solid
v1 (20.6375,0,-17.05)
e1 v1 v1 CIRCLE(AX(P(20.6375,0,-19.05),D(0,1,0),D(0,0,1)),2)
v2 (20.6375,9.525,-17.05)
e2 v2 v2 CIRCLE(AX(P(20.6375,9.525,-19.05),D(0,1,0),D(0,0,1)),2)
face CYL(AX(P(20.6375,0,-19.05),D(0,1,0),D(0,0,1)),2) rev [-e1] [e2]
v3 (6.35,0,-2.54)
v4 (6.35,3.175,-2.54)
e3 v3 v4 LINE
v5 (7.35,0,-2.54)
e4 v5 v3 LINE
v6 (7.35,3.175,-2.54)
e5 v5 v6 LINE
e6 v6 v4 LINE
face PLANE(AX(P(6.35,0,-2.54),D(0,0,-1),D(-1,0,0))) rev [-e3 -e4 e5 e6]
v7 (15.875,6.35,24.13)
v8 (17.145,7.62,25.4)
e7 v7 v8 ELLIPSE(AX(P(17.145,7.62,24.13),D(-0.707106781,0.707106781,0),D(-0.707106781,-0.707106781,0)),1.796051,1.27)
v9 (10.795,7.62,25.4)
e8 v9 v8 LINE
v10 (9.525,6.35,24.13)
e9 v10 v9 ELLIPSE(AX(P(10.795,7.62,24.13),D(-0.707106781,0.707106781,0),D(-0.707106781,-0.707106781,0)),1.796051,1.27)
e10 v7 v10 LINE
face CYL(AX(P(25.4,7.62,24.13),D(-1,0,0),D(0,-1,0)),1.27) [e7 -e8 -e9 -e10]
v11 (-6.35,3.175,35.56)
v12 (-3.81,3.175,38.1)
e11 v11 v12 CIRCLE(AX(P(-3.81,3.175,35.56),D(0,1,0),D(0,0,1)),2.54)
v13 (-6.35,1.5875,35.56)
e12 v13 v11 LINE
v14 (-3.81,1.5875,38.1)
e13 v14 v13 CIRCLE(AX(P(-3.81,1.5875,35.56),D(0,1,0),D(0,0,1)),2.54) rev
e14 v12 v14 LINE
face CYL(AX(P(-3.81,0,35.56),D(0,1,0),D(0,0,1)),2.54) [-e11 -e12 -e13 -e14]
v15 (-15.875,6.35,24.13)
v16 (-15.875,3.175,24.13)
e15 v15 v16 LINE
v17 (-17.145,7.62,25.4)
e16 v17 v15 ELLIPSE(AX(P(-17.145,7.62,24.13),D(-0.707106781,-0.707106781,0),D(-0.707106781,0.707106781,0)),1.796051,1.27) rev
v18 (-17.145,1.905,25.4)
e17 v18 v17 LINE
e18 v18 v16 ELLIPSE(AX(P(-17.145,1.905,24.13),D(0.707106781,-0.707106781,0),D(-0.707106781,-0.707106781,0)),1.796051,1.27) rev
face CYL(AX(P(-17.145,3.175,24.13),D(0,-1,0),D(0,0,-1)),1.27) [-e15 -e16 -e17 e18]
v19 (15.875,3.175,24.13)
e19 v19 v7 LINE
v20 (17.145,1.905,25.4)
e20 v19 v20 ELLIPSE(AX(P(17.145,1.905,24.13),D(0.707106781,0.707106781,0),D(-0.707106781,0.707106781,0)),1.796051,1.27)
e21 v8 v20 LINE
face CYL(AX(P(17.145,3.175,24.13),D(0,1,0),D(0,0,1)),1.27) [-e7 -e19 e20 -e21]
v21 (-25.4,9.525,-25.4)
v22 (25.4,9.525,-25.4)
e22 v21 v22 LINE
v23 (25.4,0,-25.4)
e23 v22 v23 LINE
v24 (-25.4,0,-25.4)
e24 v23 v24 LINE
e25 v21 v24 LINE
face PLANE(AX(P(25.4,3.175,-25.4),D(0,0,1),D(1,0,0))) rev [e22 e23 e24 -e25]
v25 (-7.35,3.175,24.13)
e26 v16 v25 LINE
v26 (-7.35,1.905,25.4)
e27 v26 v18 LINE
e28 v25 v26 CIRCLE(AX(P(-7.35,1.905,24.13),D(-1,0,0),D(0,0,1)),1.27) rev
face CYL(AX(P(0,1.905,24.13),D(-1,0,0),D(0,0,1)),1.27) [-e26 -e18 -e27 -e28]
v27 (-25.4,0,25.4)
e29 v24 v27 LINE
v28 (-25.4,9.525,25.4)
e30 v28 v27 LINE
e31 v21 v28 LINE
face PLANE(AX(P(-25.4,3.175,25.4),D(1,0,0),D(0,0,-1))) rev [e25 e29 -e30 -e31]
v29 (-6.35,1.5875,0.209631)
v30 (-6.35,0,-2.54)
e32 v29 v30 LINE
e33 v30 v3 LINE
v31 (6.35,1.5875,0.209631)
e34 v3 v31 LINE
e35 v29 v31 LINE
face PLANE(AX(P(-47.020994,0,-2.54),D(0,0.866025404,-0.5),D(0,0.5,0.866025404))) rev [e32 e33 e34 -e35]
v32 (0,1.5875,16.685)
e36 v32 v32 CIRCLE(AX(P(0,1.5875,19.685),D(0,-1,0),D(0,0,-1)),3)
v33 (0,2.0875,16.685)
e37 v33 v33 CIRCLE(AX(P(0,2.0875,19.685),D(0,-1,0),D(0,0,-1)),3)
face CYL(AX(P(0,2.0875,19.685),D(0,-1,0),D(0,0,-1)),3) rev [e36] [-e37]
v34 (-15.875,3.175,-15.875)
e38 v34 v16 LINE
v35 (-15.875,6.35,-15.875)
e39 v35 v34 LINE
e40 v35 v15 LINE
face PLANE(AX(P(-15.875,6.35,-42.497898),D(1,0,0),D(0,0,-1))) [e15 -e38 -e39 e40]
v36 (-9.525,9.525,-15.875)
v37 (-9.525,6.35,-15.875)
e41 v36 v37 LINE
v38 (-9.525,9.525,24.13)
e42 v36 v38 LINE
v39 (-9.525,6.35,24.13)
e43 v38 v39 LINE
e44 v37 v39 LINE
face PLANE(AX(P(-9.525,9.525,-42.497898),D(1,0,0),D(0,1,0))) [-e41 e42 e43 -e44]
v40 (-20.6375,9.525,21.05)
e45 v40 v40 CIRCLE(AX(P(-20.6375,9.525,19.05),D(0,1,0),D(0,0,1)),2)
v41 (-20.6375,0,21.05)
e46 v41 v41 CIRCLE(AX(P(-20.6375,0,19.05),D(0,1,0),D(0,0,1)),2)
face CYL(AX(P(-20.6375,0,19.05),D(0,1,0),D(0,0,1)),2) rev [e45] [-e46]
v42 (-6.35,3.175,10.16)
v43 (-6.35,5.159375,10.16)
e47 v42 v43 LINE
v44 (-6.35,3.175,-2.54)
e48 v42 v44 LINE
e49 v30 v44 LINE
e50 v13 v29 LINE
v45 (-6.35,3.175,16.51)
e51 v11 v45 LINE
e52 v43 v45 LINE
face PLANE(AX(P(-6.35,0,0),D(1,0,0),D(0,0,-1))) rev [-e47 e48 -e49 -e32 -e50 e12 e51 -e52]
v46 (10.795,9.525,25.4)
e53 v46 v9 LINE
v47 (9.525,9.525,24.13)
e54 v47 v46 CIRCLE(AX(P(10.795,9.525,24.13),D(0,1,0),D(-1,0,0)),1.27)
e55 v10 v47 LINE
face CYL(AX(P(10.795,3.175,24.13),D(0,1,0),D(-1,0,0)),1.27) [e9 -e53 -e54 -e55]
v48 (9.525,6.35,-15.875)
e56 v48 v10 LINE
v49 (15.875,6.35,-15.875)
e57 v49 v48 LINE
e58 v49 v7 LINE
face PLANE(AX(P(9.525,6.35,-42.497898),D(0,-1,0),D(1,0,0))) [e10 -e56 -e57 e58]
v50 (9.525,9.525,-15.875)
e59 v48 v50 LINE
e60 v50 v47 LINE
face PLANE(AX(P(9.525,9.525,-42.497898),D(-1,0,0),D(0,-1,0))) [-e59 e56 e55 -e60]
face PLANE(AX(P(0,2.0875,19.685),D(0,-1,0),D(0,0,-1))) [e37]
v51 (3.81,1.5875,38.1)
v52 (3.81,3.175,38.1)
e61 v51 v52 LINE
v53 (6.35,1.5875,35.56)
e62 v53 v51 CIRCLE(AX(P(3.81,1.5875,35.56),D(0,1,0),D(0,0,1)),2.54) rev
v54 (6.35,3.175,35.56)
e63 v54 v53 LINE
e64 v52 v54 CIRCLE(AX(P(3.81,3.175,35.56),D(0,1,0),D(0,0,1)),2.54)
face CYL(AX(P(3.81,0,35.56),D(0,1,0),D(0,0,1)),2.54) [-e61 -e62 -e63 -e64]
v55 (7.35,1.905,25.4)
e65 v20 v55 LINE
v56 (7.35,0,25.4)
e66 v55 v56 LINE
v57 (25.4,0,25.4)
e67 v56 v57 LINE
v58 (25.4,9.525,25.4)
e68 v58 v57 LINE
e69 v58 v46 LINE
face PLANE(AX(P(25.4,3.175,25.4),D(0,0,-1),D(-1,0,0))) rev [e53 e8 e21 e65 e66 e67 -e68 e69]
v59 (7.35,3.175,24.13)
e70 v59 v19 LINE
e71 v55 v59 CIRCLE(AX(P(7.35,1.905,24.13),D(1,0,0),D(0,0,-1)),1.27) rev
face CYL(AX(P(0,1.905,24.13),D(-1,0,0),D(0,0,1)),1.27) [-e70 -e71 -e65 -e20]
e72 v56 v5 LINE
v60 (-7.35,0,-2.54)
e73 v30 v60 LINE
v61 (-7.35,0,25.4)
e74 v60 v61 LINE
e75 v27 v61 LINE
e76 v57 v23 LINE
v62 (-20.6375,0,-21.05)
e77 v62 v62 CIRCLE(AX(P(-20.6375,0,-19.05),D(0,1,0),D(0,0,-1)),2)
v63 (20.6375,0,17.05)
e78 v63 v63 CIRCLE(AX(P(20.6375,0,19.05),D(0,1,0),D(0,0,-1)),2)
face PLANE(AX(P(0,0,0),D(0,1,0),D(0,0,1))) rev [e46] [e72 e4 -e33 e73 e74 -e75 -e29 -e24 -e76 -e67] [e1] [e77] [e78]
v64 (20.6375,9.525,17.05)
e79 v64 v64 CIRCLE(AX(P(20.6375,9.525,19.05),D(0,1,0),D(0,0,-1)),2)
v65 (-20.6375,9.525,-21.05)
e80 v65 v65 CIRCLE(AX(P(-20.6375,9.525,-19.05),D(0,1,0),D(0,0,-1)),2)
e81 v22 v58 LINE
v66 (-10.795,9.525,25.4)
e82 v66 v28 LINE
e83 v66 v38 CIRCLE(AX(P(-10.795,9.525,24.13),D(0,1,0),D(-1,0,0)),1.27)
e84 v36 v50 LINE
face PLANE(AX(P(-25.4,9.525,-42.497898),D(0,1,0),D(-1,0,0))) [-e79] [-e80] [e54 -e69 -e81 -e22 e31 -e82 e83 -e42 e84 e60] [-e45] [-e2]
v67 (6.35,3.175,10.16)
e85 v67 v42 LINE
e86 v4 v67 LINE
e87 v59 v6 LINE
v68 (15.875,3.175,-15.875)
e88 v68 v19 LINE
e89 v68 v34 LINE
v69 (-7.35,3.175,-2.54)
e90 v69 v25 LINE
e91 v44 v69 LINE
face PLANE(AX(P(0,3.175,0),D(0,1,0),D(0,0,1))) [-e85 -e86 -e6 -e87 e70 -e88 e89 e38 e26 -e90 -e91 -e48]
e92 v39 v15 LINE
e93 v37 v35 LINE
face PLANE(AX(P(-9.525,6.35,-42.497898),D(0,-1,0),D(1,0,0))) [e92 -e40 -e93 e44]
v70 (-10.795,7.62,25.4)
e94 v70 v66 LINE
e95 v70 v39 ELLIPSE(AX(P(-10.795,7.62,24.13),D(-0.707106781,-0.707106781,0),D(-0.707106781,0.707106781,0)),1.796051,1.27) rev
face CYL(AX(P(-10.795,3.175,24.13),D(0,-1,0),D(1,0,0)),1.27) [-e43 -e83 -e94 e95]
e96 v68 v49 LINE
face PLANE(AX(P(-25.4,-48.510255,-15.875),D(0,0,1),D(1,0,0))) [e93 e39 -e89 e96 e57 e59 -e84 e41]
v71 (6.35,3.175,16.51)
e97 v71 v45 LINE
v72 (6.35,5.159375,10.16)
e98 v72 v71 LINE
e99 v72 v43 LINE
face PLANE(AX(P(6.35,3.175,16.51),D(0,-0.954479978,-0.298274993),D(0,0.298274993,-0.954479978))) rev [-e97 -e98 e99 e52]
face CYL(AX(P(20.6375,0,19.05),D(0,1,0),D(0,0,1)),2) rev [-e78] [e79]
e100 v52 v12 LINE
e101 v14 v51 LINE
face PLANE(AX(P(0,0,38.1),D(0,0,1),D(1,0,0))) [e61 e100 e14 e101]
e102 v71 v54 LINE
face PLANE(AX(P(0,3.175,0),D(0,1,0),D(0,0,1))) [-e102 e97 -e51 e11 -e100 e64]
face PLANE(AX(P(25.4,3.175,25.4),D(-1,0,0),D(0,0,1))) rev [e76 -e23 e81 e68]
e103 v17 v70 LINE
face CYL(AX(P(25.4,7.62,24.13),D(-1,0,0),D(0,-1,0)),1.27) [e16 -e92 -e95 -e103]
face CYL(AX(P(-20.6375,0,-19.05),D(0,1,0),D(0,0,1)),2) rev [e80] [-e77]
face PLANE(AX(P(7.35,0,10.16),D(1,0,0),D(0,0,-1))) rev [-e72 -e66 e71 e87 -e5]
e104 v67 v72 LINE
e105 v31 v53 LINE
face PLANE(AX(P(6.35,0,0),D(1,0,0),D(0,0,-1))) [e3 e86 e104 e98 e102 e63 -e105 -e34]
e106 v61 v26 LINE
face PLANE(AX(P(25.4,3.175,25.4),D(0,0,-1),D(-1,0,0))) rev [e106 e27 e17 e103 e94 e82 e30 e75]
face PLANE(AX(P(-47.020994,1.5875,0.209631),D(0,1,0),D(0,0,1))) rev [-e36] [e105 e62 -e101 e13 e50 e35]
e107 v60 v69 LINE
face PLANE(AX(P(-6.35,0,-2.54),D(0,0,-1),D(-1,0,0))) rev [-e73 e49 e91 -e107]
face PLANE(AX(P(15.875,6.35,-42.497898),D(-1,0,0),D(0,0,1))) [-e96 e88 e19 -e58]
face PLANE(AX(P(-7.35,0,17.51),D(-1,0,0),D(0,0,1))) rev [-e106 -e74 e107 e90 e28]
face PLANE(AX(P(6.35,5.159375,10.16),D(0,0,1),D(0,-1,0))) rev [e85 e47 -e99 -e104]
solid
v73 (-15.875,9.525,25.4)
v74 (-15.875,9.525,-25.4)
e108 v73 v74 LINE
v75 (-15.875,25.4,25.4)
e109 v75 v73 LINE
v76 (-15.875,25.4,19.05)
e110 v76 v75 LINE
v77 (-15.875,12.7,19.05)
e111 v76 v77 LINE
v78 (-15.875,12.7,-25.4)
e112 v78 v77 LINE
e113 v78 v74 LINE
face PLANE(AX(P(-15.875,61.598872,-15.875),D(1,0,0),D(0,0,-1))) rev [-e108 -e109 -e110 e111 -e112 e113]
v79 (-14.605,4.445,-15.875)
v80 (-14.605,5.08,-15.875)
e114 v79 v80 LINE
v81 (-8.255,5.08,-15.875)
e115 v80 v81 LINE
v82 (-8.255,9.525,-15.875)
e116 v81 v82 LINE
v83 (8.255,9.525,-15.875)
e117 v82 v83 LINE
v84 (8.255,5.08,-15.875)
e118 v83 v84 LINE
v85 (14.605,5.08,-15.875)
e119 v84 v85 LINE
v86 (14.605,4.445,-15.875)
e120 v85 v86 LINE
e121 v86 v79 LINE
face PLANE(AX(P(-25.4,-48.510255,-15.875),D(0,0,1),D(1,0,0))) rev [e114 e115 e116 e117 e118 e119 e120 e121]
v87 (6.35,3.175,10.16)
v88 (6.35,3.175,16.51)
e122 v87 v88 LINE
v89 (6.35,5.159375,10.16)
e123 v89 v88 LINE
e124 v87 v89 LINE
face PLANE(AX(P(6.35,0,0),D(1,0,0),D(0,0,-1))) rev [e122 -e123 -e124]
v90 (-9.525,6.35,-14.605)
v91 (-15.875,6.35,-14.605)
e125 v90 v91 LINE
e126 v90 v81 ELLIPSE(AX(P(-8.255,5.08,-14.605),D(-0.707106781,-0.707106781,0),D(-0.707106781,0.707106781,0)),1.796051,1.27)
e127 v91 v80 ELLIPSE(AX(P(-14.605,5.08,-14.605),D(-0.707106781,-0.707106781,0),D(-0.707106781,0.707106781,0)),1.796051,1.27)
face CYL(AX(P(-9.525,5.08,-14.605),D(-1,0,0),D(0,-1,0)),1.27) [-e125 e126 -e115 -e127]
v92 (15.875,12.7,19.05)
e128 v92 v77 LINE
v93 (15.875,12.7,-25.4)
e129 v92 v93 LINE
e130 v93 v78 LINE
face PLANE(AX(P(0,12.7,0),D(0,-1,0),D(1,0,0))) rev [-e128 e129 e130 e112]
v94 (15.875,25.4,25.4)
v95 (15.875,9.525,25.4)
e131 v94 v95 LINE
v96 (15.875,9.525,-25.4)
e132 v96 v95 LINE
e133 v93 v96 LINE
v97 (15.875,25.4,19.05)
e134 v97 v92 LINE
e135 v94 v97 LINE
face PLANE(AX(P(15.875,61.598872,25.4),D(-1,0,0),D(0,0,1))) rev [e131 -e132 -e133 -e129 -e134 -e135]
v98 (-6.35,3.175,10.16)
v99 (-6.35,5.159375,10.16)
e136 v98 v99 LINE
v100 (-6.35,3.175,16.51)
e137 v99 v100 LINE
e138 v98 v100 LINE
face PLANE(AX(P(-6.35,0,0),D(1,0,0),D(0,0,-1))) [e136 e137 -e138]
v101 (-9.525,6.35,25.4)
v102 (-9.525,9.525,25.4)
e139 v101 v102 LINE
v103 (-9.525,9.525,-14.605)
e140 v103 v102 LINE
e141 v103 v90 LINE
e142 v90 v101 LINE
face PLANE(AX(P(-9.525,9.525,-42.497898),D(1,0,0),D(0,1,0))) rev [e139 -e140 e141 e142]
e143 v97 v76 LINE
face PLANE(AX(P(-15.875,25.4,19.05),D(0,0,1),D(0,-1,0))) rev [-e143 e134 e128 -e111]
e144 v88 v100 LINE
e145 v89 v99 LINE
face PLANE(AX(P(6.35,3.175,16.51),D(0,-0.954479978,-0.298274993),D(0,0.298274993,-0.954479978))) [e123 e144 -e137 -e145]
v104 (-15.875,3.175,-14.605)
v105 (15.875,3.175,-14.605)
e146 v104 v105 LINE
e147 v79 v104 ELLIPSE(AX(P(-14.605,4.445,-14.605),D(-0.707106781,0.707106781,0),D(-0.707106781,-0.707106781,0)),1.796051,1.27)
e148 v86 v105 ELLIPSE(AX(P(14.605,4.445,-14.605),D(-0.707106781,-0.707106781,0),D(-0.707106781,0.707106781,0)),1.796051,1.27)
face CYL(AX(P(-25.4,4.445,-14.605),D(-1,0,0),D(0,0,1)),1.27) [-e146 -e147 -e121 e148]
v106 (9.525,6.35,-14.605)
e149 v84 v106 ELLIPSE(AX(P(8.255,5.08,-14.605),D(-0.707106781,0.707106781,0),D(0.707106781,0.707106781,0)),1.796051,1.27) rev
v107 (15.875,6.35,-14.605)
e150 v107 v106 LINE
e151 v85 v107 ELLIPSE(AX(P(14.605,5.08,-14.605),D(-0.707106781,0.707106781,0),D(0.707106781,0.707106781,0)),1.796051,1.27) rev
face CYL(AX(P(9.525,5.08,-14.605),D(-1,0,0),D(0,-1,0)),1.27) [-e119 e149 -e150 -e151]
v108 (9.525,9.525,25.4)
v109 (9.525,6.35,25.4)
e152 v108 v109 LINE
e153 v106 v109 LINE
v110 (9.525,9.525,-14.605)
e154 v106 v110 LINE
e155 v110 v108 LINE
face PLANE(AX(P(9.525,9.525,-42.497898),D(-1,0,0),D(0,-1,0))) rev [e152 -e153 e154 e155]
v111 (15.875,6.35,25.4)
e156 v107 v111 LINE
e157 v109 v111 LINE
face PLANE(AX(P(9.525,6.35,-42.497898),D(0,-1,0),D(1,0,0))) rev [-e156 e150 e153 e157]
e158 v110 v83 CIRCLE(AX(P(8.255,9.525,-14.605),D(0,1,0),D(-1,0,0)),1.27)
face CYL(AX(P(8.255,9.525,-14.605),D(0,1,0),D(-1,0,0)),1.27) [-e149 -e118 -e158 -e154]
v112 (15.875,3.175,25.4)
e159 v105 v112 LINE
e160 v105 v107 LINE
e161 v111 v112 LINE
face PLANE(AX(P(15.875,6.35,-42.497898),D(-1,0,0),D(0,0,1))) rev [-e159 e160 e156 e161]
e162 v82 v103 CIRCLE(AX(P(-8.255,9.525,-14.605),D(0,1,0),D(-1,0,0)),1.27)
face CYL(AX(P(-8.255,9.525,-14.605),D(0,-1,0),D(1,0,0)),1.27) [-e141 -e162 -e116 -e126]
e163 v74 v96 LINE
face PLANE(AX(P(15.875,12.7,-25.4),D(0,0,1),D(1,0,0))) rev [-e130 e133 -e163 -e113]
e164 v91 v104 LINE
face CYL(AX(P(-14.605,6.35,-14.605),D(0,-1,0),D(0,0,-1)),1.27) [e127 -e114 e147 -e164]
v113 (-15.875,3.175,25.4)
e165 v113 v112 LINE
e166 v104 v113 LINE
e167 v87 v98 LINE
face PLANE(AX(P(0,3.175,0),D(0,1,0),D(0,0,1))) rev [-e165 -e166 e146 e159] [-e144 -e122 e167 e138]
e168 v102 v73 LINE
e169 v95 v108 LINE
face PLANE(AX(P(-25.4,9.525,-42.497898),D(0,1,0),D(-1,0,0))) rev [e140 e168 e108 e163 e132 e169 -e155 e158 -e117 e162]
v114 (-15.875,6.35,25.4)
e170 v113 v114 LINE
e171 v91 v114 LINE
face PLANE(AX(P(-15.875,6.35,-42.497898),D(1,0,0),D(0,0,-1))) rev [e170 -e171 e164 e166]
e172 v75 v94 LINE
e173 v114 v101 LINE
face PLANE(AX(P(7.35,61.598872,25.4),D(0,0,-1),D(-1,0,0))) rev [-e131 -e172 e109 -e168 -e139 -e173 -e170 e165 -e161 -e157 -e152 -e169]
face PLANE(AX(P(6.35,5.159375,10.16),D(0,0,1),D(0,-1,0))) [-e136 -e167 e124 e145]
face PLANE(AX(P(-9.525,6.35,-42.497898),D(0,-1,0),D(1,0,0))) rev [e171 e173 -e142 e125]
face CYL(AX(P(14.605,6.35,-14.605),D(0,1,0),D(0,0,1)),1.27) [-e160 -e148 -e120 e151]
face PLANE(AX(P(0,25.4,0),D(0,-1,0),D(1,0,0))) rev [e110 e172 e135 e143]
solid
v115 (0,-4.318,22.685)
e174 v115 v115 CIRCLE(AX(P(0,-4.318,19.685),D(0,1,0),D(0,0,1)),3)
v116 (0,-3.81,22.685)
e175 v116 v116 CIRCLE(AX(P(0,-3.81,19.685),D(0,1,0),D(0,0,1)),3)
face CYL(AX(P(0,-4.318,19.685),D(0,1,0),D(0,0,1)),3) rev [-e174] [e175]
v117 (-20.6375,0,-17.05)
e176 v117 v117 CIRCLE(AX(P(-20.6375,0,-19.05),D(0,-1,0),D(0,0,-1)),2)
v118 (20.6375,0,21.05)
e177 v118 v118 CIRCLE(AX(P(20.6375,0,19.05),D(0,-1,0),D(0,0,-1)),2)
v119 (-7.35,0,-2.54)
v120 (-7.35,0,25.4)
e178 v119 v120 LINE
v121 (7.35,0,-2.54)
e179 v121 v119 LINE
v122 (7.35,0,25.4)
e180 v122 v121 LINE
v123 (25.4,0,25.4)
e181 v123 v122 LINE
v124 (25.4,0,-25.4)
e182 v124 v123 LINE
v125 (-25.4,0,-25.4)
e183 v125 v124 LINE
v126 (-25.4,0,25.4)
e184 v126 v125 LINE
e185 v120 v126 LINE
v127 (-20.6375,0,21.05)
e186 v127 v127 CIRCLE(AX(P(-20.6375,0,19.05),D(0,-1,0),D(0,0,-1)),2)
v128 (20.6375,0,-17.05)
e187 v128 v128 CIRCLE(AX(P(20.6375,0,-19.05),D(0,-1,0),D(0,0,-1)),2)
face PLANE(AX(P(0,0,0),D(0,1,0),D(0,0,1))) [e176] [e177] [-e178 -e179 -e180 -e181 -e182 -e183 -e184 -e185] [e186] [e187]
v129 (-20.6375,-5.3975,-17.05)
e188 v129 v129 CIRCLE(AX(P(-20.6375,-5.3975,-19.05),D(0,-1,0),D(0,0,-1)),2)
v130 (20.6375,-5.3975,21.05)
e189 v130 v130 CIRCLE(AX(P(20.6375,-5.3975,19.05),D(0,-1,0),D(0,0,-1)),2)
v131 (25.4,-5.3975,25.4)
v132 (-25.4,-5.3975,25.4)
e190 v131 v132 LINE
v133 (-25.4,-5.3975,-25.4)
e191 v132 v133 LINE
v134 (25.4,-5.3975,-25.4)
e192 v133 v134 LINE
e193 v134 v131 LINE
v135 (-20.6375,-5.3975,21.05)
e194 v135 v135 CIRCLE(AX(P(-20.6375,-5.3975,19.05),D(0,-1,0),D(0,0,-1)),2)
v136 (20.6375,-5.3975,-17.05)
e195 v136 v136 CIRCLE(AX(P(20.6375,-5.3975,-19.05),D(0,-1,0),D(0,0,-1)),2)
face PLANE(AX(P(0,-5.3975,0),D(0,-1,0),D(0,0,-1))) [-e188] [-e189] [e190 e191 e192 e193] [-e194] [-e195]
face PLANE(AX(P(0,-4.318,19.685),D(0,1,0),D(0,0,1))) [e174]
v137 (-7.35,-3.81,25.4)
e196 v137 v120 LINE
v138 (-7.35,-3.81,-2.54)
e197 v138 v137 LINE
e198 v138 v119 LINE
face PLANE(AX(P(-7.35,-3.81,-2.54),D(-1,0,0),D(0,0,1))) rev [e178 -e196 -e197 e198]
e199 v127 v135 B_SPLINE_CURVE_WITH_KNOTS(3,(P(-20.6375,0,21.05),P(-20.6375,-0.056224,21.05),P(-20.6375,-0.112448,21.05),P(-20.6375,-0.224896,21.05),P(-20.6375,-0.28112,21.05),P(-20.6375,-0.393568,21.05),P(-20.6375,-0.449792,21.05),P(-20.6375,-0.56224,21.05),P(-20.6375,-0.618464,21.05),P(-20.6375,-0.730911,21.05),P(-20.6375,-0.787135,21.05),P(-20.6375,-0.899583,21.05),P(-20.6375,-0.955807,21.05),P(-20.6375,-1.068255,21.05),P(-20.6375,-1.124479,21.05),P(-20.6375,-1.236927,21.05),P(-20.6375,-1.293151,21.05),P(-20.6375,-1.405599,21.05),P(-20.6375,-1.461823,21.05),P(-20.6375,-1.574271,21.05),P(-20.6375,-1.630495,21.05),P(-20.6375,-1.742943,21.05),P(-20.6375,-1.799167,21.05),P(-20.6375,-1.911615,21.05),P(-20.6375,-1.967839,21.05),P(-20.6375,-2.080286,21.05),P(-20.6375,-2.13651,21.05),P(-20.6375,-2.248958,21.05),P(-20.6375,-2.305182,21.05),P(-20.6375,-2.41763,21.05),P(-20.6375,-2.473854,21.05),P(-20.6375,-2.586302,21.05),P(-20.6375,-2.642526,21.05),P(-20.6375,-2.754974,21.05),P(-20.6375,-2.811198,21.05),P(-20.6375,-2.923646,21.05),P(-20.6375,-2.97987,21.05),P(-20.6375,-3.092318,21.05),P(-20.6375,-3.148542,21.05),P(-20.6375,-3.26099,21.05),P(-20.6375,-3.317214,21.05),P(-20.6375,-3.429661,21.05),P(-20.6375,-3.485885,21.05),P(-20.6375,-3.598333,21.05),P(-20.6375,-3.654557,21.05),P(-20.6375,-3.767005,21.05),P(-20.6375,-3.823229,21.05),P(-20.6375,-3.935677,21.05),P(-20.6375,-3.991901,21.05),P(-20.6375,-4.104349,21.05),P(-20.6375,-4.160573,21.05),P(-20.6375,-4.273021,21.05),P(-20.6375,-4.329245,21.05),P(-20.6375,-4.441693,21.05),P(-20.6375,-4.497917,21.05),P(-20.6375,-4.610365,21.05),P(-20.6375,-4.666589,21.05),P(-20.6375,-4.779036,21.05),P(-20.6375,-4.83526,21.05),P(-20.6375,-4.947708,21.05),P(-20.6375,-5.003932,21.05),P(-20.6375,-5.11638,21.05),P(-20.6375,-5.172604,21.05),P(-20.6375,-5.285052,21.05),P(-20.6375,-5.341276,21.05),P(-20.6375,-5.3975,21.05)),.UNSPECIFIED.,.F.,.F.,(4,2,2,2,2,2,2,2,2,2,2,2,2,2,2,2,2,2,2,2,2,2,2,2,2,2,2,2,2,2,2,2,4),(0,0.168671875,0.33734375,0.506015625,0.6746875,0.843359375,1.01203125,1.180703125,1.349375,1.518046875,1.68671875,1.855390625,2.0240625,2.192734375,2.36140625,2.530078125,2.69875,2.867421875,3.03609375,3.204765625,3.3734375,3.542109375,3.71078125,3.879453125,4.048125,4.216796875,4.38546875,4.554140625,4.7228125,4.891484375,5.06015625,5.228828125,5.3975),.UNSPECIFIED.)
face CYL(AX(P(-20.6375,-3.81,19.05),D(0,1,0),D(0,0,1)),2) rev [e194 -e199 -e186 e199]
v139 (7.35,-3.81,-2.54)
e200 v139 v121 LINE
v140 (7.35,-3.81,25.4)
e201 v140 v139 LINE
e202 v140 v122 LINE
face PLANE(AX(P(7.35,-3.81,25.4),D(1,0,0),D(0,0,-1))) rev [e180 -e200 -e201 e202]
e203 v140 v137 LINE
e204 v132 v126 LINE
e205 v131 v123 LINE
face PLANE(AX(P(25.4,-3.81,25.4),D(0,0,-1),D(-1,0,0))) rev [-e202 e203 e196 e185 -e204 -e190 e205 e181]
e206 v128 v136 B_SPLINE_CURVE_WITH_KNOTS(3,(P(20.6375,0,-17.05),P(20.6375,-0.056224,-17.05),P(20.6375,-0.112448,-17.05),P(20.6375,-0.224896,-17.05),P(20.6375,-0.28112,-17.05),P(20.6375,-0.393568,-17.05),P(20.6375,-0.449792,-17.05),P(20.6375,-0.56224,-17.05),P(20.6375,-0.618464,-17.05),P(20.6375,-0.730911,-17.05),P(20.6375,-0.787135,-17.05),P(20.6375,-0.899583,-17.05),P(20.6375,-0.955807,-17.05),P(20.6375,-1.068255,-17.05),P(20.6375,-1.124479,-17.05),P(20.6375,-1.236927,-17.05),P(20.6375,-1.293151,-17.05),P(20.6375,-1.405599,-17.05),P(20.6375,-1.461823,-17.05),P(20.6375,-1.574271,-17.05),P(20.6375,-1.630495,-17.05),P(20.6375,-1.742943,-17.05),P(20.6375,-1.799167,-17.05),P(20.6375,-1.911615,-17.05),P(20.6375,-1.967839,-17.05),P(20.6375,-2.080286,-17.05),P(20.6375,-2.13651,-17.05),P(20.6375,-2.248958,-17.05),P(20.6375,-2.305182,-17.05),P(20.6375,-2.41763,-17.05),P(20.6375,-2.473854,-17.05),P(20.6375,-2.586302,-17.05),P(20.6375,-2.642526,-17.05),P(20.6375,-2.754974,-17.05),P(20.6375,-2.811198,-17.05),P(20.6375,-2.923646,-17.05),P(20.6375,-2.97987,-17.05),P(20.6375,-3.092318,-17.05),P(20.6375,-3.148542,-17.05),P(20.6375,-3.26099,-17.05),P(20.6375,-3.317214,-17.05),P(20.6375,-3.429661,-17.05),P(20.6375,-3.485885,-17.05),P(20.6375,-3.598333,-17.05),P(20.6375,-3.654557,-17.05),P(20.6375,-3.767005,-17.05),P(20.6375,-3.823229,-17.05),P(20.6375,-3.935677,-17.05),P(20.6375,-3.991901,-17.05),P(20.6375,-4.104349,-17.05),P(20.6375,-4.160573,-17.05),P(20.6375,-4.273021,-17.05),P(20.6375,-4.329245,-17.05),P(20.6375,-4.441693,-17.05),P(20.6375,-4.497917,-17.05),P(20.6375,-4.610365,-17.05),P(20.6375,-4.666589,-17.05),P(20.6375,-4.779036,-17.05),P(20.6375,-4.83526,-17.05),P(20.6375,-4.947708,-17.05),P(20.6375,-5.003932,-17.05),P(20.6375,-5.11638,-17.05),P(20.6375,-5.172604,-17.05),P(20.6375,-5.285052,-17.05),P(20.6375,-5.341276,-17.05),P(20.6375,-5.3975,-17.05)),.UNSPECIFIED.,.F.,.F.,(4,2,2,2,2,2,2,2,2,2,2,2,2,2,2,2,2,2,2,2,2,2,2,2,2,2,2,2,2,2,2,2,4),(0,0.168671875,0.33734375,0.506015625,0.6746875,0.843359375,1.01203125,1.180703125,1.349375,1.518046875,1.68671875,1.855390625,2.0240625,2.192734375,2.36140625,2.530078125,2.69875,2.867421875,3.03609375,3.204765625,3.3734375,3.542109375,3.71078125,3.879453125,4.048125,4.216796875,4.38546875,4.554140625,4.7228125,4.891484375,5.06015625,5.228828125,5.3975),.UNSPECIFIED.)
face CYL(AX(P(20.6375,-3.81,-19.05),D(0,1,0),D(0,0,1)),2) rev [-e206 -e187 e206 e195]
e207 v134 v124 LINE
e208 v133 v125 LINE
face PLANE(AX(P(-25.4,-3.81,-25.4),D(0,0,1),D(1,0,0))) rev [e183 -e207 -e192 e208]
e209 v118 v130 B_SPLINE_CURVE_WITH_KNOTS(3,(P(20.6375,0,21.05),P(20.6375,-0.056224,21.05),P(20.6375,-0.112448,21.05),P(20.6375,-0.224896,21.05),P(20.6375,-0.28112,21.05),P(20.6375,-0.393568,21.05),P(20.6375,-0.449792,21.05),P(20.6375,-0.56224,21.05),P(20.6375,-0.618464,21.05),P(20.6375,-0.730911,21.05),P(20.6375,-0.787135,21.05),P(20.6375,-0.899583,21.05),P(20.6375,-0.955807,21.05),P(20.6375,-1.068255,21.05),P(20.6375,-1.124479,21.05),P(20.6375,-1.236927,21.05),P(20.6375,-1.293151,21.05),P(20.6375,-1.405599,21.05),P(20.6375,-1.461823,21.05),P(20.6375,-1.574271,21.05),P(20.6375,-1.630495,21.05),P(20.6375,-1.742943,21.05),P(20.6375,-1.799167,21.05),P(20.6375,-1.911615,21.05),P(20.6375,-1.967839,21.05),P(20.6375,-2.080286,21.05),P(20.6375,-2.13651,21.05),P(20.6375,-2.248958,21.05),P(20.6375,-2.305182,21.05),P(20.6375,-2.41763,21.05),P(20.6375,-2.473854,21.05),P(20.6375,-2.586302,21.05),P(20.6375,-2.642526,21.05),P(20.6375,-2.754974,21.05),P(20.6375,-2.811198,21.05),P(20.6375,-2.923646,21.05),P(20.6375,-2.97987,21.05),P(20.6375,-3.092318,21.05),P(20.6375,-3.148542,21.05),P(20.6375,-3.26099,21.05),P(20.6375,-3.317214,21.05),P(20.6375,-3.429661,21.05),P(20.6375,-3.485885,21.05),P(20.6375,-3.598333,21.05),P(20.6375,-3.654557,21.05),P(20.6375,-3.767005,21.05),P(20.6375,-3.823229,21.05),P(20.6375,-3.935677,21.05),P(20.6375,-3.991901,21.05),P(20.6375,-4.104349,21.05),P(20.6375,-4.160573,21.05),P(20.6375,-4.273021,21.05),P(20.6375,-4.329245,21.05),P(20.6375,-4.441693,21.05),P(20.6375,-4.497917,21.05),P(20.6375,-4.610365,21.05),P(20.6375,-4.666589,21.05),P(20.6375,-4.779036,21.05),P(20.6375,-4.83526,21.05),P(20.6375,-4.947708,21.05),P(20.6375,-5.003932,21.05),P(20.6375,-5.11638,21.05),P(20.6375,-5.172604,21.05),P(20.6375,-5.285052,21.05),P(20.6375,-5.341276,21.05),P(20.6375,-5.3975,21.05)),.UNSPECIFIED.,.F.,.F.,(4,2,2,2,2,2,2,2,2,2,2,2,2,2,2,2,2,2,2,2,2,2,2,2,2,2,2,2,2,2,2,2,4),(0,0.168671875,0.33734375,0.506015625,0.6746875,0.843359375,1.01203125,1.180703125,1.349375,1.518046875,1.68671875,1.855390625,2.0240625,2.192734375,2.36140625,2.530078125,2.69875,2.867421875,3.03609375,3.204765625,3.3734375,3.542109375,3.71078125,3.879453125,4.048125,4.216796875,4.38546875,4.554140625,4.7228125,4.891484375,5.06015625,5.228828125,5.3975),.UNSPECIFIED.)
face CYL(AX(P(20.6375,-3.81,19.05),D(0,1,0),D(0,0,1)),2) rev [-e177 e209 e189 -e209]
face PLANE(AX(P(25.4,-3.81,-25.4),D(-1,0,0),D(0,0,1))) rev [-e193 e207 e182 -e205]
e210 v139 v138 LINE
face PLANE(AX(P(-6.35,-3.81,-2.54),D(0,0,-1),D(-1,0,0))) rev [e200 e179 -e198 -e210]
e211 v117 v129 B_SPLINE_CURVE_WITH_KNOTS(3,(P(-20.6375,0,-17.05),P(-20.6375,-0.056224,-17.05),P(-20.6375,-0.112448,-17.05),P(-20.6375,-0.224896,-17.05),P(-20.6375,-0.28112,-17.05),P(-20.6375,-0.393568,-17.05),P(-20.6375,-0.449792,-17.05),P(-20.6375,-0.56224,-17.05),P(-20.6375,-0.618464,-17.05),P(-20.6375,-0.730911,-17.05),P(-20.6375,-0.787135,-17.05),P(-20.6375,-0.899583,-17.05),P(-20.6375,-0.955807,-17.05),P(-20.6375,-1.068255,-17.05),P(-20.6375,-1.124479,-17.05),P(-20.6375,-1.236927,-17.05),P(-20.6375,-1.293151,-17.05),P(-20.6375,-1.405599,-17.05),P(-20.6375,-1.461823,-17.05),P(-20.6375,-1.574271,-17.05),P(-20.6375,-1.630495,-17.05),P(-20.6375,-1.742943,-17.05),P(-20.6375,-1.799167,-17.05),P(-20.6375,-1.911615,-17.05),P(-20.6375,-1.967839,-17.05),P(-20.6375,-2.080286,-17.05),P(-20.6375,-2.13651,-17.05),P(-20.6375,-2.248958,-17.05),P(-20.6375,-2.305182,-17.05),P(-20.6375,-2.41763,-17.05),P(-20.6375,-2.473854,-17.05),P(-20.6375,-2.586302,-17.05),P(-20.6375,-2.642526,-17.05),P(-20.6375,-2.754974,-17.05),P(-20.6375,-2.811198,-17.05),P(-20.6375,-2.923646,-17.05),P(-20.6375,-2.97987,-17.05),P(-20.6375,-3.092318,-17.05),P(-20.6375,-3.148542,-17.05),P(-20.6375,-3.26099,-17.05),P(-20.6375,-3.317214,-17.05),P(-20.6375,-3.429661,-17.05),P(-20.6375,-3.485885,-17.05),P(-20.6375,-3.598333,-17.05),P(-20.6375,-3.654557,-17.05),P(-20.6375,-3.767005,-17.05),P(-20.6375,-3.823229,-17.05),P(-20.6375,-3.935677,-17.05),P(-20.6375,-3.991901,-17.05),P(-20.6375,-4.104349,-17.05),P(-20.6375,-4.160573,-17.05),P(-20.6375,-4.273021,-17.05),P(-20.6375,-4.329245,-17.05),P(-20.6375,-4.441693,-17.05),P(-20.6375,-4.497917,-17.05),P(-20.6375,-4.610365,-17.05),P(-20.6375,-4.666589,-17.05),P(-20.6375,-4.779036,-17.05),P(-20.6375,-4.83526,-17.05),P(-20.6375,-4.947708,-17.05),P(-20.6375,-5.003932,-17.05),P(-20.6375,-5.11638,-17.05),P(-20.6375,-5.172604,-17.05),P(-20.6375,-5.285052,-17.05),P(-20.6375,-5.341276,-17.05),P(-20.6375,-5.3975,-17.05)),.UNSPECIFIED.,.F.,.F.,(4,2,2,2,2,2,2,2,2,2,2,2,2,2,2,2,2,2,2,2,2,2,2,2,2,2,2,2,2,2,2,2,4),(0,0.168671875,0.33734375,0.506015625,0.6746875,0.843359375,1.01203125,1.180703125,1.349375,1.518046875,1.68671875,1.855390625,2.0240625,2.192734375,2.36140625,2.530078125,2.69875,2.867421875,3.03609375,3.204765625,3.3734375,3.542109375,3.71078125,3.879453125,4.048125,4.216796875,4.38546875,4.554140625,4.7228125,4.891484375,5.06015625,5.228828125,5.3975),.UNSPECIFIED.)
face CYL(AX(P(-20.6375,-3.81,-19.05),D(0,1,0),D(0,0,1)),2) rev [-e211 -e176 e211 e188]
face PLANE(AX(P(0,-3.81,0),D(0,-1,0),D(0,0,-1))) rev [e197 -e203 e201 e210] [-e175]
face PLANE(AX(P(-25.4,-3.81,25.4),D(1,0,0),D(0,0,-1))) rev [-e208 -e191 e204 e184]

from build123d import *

# Parameters (mm, degrees)
SKETCH1_W               = 50.8
SKETCH1_H               = 50.8
BOSS_EXTRUDE1_DEPTH     = 3.175
BOSS_EXTRUDE5_DEPTH     = 6.35
CUT_EXTRUDE4_DEPTH      = 37.061067996
SKETCH19_W              = 12.7
SKETCH19_H              = 3.175
BOSS_EXTRUDE10_DEPTH    = 12.7
BOSS_EXTRUDE2_DEPTH     = 50.8
BOSS_EXTRUDE6_REACH     = 48.771
SKETCH10_W              = 50.8
SKETCH10_H              = 9.525
SKETCH12_R              = 2
CUT_EXTRUDE2_DEPTH      = 47.770670564
CUT_EXTRUDE5_DEPTH      = 12.7
SKETCH21_R              = 3
CUT_EXTRUDE6_DEPTH      = 0.5
FILLET2_R               = 2.54
BOSS_EXTRUDE11_DEPTH    = 6.35
SKETCH23_W              = 31.75
SKETCH23_H              = 50.8
BOSS_EXTRUDE12_DEPTH    = 3.175
INTERSECT6_START        = -15.875
INTERSECT6_OUTLINE_W    = 3.175
INTERSECT6_OUTLINE_H    = 50.8
INTERSECT6_DEPTH        = 31.75
INTERSECT6_START_2      = -9.525
INTERSECT6_2_OUTLINE_W  = 3.175
INTERSECT6_2_OUTLINE_H  = 41.275
INTERSECT6_2_DEPTH      = 19.05
INTERSECT6_3_DEPTH      = 9.525
INTERSECT6_START_3      = 6.35
INTERSECT6_4_DEPTH      = 9.525
INTERSECT6_5_OUTLINE_R  = 2
INTERSECT6_5_DEPTH      = 9.525
INTERSECT6_START_4      = 1.5875
INTERSECT6_6_OUTLINE_R  = 3
INTERSECT6_6_DEPTH      = 1.5875
INTERSECT6_START_5      = 2.0875
INTERSECT6_7_OUTLINE_R  = 3
INTERSECT6_7_DEPTH      = 1.0875
INTERSECT6_8_OUTLINE_W  = 1.5875
INTERSECT6_8_OUTLINE_H  = 13.335
INTERSECT6_8_DEPTH      = 31.75
INTERSECT6_9_OUTLINE_W  = 1.5875
INTERSECT6_9_OUTLINE_H  = 27.94
INTERSECT6_9_DEPTH      = 8.525
INTERSECT6_START_6      = 7.35
INTERSECT6_10_OUTLINE_W = 1.5875
INTERSECT6_10_OUTLINE_H = 27.94
INTERSECT6_10_DEPTH     = 8.525
INTERSECT6_START_7      = -6.35
INTERSECT6_11_DEPTH     = 12.7
SKETCH24_R              = 2
BOSS_EXTRUDE13_DEPTH    = 3.81
SKETCH26_W              = 50.8
SKETCH26_H              = 50.8
SKETCH26_R              = 2
BOSS_EXTRUDE15_DEPTH    = 1.5875
CUT_EXTRUDE7_START      = -0.508
SKETCH27_R              = 3
CUT_EXTRUDE7_DEPTH      = 0.508
FILLET3_R               = 1.27
FILLET4_R               = 1.27
SKETCH28_W              = 31.75
SKETCH28_H              = 6.35
BOSS_EXTRUDE16_DEPTH    = 12.7


with BuildPart() as part:
    # Sketch1 → Boss-Extrude1 (new body)
    with BuildSketch(Plane(origin=(0, 0, 0), x_dir=(1, 0, 0), z_dir=(0, 1, 0))):
        Rectangle(SKETCH1_W, SKETCH1_H)
    extrude(amount=BOSS_EXTRUDE1_DEPTH)

    # Sketch7 → Boss-Extrude5 (add, symmetric)
    with BuildSketch(Plane(origin=(0, 0, 0), x_dir=(0, 0, -1), z_dir=(1, 0, 0))):
        Polygon((-16.51, 3.175), (-10.16, 5.159375), (-10.16, 3.175), align=None)
    extrude(amount=BOSS_EXTRUDE5_DEPTH, both=True)

    # Sketch18 → Cut-Extrude4 (cut, through all)
    with BuildSketch(Plane(origin=(0, 3.175, 0), x_dir=(1, 0, 0), z_dir=(0, 1, 0))):
        Polygon((7.35, -17.51), (7.35, -10.16), (7.35, 2.54), (6.35, 2.54), (6.35, -10.16), (6.35, -16.51), (6.35, -25.4), (-6.35, -25.4), (-6.35, -16.51), (-6.35, -10.16), (-6.35, 2.54), (-7.35, 2.54), (-7.35, -10.16), (-7.35, -17.51), (-7.35, -29.229001294), (7.35, -29.229001294), align=None)
    extrude(amount=-CUT_EXTRUDE4_DEPTH, mode=Mode.SUBTRACT)

    # Sketch19 → Boss-Extrude10 (add)
    with BuildSketch(Plane.XY.offset(25.4)):
        with Locations((0, 1.5875)):
            Rectangle(SKETCH19_W, SKETCH19_H)
    extrude(amount=BOSS_EXTRUDE10_DEPTH)

    # Sketch3 → Boss-Extrude2 (add)
    with BuildSketch(Plane.XY.offset(25.4)):
        Polygon((-15.875, 3.175), (-25.4, 3.175), (-25.4, 9.525), (-9.525, 9.525), (-9.525, 6.35), (-15.875, 6.35), align=None)
        Polygon((9.525, 6.35), (15.875, 6.35), (15.875, 3.175), (25.4, 3.175), (25.4, 9.525), (9.525, 9.525), align=None)
    extrude(amount=-BOSS_EXTRUDE2_DEPTH)

    # Boss-Extrude6: up to this face of the body (flat: up to its plane)
    boss_extrude6_end = Plane(part.part.faces().sort_by_distance((0, 3.175, -2.992354694))[0])
    # Sketch10 → Boss-Extrude6 (add, up to the picked face)
    with BuildSketch(Plane(origin=(0, 9.525, 0), x_dir=(1, 0, 0), z_dir=(0, 1, 0)), mode=Mode.PRIVATE) as boss_extrude6_sk1:
        with Locations((0, 20.6375)):
            Rectangle(SKETCH10_W, SKETCH10_H)
    boss_extrude6_tool1 = split(extrude(boss_extrude6_sk1.sketch, amount=-BOSS_EXTRUDE6_REACH, mode=Mode.PRIVATE), bisect_by=boss_extrude6_end, keep=Keep.BOTH, mode=Mode.PRIVATE)
    add(boss_extrude6_tool1.solids().sort_by(Axis((0, 9.525, -20.6375), (0, -1, 0)))[0])

    # Sketch12 → Cut-Extrude2 (cut, through all)
    with BuildSketch(Plane(origin=(0, 9.525, 0), x_dir=(1, 0, 0), z_dir=(0, 1, 0))):
        with Locations(Location((-20.6375, -19.05, 0), (0, 0, 270))):
            Circle(SKETCH12_R)
        with Locations(Location((20.6375, -19.05, 0), (0, 0, 90))):
            Circle(SKETCH12_R)
        with Locations(Location((20.6375, 19.05, 0), (0, 0, 270))):
            Circle(SKETCH12_R)
        with Locations(Location((-20.6375, 19.05, 0), (0, 0, 90))):
            Circle(SKETCH12_R)
    extrude(amount=-CUT_EXTRUDE2_DEPTH, mode=Mode.SUBTRACT)

    # Sketch20 → Cut-Extrude5 (cut)
    with BuildSketch(Plane(origin=(6.35, 0, 0), x_dir=(0, 0, -1), z_dir=(1, 0, 0))):
        Polygon((2.54, 0), (-0.209630657, 1.5875), (-38.1, 1.5875), (-38.1, 0), align=None)
    extrude(amount=-CUT_EXTRUDE5_DEPTH, mode=Mode.SUBTRACT)

    # Sketch21 → Cut-Extrude6 (cut)
    with BuildSketch(Plane.XZ.offset(-1.5875)):
        with Locations(Location((0, 19.685, 0), (0, 0, 270))):
            Circle(SKETCH21_R)
    extrude(amount=-CUT_EXTRUDE6_DEPTH, mode=Mode.SUBTRACT)

    # Fillet2
    fillet2_edges = [part.edges().sort_by_distance(p)[0] for p in [
        (6.35, 2.38125, 38.1),
        (-6.35, 2.38125, 38.1),
    ]]
    fillet(fillet2_edges, radius=FILLET2_R)

    # Fillet3
    fillet3_edges = [part.edges().sort_by_distance(p)[0] for p in [
        (9.525, 7.9375, 25.4),
        (12.7, 6.35, 25.4),
        (15.875, 4.7625, 25.4),
        (11.6125, 3.175, 25.4),
        (-11.6125, 3.175, 25.4),
        (-15.875, 4.7625, 25.4),
        (-12.7, 6.35, 25.4),
        (-9.525, 7.9375, 25.4),
    ]]
    fillet(fillet3_edges, radius=FILLET3_R)


with BuildPart() as body_2:
    # Sketch22 → Boss-Extrude11 (new body)
    with BuildSketch(Plane(origin=(0, 3.175, 0), x_dir=(1, 0, 0), z_dir=(0, 1, 0))):
        Polygon((-7.35, -25.4), (7.35, -25.4), (15.875, -25.4), (15.875, 15.875), (-15.875, 15.875), (-15.875, -25.4), align=None)
    extrude(amount=BOSS_EXTRUDE11_DEPTH)

    # Sketch23 → Boss-Extrude12 (add)
    with BuildSketch(Plane(origin=(0, 9.525, 0), x_dir=(1, 0, 0), z_dir=(0, 1, 0))):
        Rectangle(SKETCH23_W, SKETCH23_H)
    extrude(amount=BOSS_EXTRUDE12_DEPTH)


with BuildPart() as body_3:
    # Intersect6: read off the stored shape, not the designer's step
    # Intersect6 outline → Intersect6 (new body)
    with BuildSketch(Plane.YZ.offset(INTERSECT6_START)):
        Polygon((3.175, 10.16), (3.175, -15.875), (6.35, -15.875), (6.35, 25.4), (3.175, 25.4), (3.175, 16.51), (5.159375, 10.16), align=None)
        with Locations((11.1125, 0)):
            Rectangle(INTERSECT6_OUTLINE_W, INTERSECT6_OUTLINE_H)
    extrude(amount=INTERSECT6_DEPTH)

    # Intersect6 2 outline → Intersect6 2 (add)
    with BuildSketch(Plane.YZ.offset(INTERSECT6_START_2)):
        with Locations((7.9375, 4.7625)):
            Rectangle(INTERSECT6_2_OUTLINE_W, INTERSECT6_2_OUTLINE_H)
    extrude(amount=INTERSECT6_2_DEPTH)

    # Intersect6 3 outline → Intersect6 3 (add)
    with BuildSketch(Plane.YZ.offset(INTERSECT6_START)):
        Polygon((3.175, 16.51), (3.175, 10.16), (5.159375, 10.16), align=None)
    extrude(amount=INTERSECT6_3_DEPTH)

    # Intersect6 4 outline → Intersect6 4 (add)
    with BuildSketch(Plane.YZ.offset(INTERSECT6_START_3)):
        Polygon((3.175, 16.51), (3.175, 10.16), (5.159375, 10.16), align=None)
    extrude(amount=INTERSECT6_4_DEPTH)

    # Fillet4
    fillet4_edges = [body_3.edges().sort_by_distance(p)[0] for p in [
        (12.7, 6.35, -15.875),
        (-15.875, 4.7625, -15.875),
        (-9.525, 7.9375, -15.875),
        (-12.7, 6.35, -15.875),
        (9.525, 7.9375, -15.875),
        (15.875, 4.7625, -15.875),
        (0, 3.175, -15.875),
    ]]
    fillet(fillet4_edges, radius=FILLET4_R)

    # Sketch28 → Boss-Extrude16 (add)
    with BuildSketch(Plane(origin=(0, 12.7, 0), x_dir=(1, 0, 0), z_dir=(0, 1, 0))):
        with Locations((0, -22.225)):
            Rectangle(SKETCH28_W, SKETCH28_H)
    extrude(amount=BOSS_EXTRUDE16_DEPTH)


with BuildPart() as body_4:
    # Intersect6 5 outline → Intersect6 5 (new body)
    with BuildSketch(Plane(origin=(0, 0, 0), x_dir=(1, 0, 0), z_dir=(0, 1, 0))):
        Polygon((-15.875, 15.875), (15.875, 15.875), (15.875, -25.4), (25.4, -25.4), (25.4, 25.4), (-25.4, 25.4), (-25.4, -25.4), (-15.875, -25.4), align=None)
        with Locations((-20.6375, -19.05)):
            Circle(INTERSECT6_5_OUTLINE_R, mode=Mode.SUBTRACT)
        with Locations((20.6375, -19.05)):
            Circle(INTERSECT6_5_OUTLINE_R, mode=Mode.SUBTRACT)
        with Locations((-20.6375, 19.05)):
            Circle(INTERSECT6_5_OUTLINE_R, mode=Mode.SUBTRACT)
        with Locations((20.6375, 19.05)):
            Circle(INTERSECT6_5_OUTLINE_R, mode=Mode.SUBTRACT)
    extrude(amount=INTERSECT6_5_DEPTH)

    # Intersect6 6 outline → Intersect6 6 (add)
    with BuildSketch(Plane(origin=(0, 0, 0), x_dir=(1, 0, 0), z_dir=(0, 1, 0)).offset(INTERSECT6_START_4)):
        with BuildLine():
            Line((15.875, -25.4), (15.875, 15.875))
            Line((15.875, 15.875), (-15.875, 15.875))
            Line((-15.875, 15.875), (-15.875, -25.4))
            Line((-15.875, -25.4), (-7.35, -25.4))
            Line((-7.35, -25.4), (-7.35, 2.54))
            Line((-7.35, 2.54), (-6.35, 2.54))
            Line((-6.35, 2.54), (-6.35, -35.56))
            ThreePointArc((-6.35, -35.56), (-5.606051224, -37.356051224), (-3.81, -38.1))
            Line((-3.81, -38.1), (3.81, -38.1))
            ThreePointArc((3.81, -38.1), (5.606051224, -37.356051224), (6.35, -35.56))
            Line((6.35, -35.56), (6.35, 2.54))
            Line((6.35, 2.54), (7.35, 2.54))
            Line((7.35, 2.54), (7.35, -25.4))
            Line((7.35, -25.4), (15.875, -25.4))
        make_face()
        with Locations((0, -19.685)):
            Circle(INTERSECT6_6_OUTLINE_R, mode=Mode.SUBTRACT)
    extrude(amount=INTERSECT6_6_DEPTH)

    # Intersect6 7 outline → Intersect6 7 (add)
    with BuildSketch(Plane(origin=(0, 0, 0), x_dir=(1, 0, 0), z_dir=(0, 1, 0)).offset(INTERSECT6_START_5)):
        with Locations((0, -19.685)):
            Circle(INTERSECT6_7_OUTLINE_R)
    extrude(amount=INTERSECT6_7_DEPTH)

    # Intersect6 8 outline → Intersect6 8 (add)
    with BuildSketch(Plane.YZ.offset(INTERSECT6_START)):
        with Locations((0.79375, -9.2075)):
            Rectangle(INTERSECT6_8_OUTLINE_W, INTERSECT6_8_OUTLINE_H)
    extrude(amount=INTERSECT6_8_DEPTH)

    # Intersect6 9 outline → Intersect6 9 (add)
    with BuildSketch(Plane.YZ.offset(INTERSECT6_START)):
        with Locations((0.79375, 11.43)):
            Rectangle(INTERSECT6_9_OUTLINE_W, INTERSECT6_9_OUTLINE_H)
    extrude(amount=INTERSECT6_9_DEPTH)

    # Intersect6 10 outline → Intersect6 10 (add)
    with BuildSketch(Plane.YZ.offset(INTERSECT6_START_6)):
        with Locations((0.79375, 11.43)):
            Rectangle(INTERSECT6_10_OUTLINE_W, INTERSECT6_10_OUTLINE_H)
    extrude(amount=INTERSECT6_10_DEPTH)

    # Intersect6 11 outline → Intersect6 11 (add)
    with BuildSketch(Plane.YZ.offset(INTERSECT6_START_7)):
        Polygon((1.5875, 0.209630657), (0, -2.54), (1.5875, -2.54), align=None)
    extrude(amount=INTERSECT6_11_DEPTH)


with BuildPart() as body_3_2:
    # Sketch24 → Boss-Extrude13 (new body)
    with BuildSketch(Plane.XZ):
        Polygon((7.35, -2.54), (6.35, -2.54), (-6.35, -2.54), (-7.35, -2.54), (-7.35, 25.4), (-25.4, 25.4), (-25.4, -25.4), (25.4, -25.4), (25.4, 25.4), (7.35, 25.4), align=None)
        with Locations(Location((20.6375, 19.05, 0), (0, 0, 90))):
            Circle(SKETCH24_R, mode=Mode.SUBTRACT)
        with Locations(Location((20.6375, -19.05, 0), (0, 0, 90))):
            Circle(SKETCH24_R, mode=Mode.SUBTRACT)
        with Locations(Location((-20.6375, -19.05, 0), (0, 0, 90))):
            Circle(SKETCH24_R, mode=Mode.SUBTRACT)
        with Locations(Location((-20.6375, 19.05, 0), (0, 0, 90))):
            Circle(SKETCH24_R, mode=Mode.SUBTRACT)
    extrude(amount=BOSS_EXTRUDE13_DEPTH)

    # Sketch26 → Boss-Extrude15 (add)
    with BuildSketch(Plane.XZ.offset(3.81)):
        Rectangle(SKETCH26_W, SKETCH26_H)
        with Locations(Location((-20.6375, -19.05, 0), (0, 0, 90))):
            Circle(SKETCH26_R, mode=Mode.SUBTRACT)
        with Locations(Location((20.6375, -19.05, 0), (0, 0, 90))):
            Circle(SKETCH26_R, mode=Mode.SUBTRACT)
        with Locations(Location((20.6375, 19.05, 0), (0, 0, 90))):
            Circle(SKETCH26_R, mode=Mode.SUBTRACT)
        with Locations(Location((-20.6375, 19.05, 0), (0, 0, 90))):
            Circle(SKETCH26_R, mode=Mode.SUBTRACT)
    extrude(amount=BOSS_EXTRUDE15_DEPTH)

    # Sketch27 → Cut-Extrude7 (cut)
    with BuildSketch(Plane(origin=(0, -3.81, 0), x_dir=(1, 0, 0), z_dir=(0, 1, 0)).offset(CUT_EXTRUDE7_START)):
        with Locations(Location((0, -19.685, 0), (0, 0, 270))):
            Circle(SKETCH27_R)
    extrude(amount=CUT_EXTRUDE7_DEPTH, mode=Mode.SUBTRACT)


solid = Compound([part.part, body_3.part, body_3_2.part])
